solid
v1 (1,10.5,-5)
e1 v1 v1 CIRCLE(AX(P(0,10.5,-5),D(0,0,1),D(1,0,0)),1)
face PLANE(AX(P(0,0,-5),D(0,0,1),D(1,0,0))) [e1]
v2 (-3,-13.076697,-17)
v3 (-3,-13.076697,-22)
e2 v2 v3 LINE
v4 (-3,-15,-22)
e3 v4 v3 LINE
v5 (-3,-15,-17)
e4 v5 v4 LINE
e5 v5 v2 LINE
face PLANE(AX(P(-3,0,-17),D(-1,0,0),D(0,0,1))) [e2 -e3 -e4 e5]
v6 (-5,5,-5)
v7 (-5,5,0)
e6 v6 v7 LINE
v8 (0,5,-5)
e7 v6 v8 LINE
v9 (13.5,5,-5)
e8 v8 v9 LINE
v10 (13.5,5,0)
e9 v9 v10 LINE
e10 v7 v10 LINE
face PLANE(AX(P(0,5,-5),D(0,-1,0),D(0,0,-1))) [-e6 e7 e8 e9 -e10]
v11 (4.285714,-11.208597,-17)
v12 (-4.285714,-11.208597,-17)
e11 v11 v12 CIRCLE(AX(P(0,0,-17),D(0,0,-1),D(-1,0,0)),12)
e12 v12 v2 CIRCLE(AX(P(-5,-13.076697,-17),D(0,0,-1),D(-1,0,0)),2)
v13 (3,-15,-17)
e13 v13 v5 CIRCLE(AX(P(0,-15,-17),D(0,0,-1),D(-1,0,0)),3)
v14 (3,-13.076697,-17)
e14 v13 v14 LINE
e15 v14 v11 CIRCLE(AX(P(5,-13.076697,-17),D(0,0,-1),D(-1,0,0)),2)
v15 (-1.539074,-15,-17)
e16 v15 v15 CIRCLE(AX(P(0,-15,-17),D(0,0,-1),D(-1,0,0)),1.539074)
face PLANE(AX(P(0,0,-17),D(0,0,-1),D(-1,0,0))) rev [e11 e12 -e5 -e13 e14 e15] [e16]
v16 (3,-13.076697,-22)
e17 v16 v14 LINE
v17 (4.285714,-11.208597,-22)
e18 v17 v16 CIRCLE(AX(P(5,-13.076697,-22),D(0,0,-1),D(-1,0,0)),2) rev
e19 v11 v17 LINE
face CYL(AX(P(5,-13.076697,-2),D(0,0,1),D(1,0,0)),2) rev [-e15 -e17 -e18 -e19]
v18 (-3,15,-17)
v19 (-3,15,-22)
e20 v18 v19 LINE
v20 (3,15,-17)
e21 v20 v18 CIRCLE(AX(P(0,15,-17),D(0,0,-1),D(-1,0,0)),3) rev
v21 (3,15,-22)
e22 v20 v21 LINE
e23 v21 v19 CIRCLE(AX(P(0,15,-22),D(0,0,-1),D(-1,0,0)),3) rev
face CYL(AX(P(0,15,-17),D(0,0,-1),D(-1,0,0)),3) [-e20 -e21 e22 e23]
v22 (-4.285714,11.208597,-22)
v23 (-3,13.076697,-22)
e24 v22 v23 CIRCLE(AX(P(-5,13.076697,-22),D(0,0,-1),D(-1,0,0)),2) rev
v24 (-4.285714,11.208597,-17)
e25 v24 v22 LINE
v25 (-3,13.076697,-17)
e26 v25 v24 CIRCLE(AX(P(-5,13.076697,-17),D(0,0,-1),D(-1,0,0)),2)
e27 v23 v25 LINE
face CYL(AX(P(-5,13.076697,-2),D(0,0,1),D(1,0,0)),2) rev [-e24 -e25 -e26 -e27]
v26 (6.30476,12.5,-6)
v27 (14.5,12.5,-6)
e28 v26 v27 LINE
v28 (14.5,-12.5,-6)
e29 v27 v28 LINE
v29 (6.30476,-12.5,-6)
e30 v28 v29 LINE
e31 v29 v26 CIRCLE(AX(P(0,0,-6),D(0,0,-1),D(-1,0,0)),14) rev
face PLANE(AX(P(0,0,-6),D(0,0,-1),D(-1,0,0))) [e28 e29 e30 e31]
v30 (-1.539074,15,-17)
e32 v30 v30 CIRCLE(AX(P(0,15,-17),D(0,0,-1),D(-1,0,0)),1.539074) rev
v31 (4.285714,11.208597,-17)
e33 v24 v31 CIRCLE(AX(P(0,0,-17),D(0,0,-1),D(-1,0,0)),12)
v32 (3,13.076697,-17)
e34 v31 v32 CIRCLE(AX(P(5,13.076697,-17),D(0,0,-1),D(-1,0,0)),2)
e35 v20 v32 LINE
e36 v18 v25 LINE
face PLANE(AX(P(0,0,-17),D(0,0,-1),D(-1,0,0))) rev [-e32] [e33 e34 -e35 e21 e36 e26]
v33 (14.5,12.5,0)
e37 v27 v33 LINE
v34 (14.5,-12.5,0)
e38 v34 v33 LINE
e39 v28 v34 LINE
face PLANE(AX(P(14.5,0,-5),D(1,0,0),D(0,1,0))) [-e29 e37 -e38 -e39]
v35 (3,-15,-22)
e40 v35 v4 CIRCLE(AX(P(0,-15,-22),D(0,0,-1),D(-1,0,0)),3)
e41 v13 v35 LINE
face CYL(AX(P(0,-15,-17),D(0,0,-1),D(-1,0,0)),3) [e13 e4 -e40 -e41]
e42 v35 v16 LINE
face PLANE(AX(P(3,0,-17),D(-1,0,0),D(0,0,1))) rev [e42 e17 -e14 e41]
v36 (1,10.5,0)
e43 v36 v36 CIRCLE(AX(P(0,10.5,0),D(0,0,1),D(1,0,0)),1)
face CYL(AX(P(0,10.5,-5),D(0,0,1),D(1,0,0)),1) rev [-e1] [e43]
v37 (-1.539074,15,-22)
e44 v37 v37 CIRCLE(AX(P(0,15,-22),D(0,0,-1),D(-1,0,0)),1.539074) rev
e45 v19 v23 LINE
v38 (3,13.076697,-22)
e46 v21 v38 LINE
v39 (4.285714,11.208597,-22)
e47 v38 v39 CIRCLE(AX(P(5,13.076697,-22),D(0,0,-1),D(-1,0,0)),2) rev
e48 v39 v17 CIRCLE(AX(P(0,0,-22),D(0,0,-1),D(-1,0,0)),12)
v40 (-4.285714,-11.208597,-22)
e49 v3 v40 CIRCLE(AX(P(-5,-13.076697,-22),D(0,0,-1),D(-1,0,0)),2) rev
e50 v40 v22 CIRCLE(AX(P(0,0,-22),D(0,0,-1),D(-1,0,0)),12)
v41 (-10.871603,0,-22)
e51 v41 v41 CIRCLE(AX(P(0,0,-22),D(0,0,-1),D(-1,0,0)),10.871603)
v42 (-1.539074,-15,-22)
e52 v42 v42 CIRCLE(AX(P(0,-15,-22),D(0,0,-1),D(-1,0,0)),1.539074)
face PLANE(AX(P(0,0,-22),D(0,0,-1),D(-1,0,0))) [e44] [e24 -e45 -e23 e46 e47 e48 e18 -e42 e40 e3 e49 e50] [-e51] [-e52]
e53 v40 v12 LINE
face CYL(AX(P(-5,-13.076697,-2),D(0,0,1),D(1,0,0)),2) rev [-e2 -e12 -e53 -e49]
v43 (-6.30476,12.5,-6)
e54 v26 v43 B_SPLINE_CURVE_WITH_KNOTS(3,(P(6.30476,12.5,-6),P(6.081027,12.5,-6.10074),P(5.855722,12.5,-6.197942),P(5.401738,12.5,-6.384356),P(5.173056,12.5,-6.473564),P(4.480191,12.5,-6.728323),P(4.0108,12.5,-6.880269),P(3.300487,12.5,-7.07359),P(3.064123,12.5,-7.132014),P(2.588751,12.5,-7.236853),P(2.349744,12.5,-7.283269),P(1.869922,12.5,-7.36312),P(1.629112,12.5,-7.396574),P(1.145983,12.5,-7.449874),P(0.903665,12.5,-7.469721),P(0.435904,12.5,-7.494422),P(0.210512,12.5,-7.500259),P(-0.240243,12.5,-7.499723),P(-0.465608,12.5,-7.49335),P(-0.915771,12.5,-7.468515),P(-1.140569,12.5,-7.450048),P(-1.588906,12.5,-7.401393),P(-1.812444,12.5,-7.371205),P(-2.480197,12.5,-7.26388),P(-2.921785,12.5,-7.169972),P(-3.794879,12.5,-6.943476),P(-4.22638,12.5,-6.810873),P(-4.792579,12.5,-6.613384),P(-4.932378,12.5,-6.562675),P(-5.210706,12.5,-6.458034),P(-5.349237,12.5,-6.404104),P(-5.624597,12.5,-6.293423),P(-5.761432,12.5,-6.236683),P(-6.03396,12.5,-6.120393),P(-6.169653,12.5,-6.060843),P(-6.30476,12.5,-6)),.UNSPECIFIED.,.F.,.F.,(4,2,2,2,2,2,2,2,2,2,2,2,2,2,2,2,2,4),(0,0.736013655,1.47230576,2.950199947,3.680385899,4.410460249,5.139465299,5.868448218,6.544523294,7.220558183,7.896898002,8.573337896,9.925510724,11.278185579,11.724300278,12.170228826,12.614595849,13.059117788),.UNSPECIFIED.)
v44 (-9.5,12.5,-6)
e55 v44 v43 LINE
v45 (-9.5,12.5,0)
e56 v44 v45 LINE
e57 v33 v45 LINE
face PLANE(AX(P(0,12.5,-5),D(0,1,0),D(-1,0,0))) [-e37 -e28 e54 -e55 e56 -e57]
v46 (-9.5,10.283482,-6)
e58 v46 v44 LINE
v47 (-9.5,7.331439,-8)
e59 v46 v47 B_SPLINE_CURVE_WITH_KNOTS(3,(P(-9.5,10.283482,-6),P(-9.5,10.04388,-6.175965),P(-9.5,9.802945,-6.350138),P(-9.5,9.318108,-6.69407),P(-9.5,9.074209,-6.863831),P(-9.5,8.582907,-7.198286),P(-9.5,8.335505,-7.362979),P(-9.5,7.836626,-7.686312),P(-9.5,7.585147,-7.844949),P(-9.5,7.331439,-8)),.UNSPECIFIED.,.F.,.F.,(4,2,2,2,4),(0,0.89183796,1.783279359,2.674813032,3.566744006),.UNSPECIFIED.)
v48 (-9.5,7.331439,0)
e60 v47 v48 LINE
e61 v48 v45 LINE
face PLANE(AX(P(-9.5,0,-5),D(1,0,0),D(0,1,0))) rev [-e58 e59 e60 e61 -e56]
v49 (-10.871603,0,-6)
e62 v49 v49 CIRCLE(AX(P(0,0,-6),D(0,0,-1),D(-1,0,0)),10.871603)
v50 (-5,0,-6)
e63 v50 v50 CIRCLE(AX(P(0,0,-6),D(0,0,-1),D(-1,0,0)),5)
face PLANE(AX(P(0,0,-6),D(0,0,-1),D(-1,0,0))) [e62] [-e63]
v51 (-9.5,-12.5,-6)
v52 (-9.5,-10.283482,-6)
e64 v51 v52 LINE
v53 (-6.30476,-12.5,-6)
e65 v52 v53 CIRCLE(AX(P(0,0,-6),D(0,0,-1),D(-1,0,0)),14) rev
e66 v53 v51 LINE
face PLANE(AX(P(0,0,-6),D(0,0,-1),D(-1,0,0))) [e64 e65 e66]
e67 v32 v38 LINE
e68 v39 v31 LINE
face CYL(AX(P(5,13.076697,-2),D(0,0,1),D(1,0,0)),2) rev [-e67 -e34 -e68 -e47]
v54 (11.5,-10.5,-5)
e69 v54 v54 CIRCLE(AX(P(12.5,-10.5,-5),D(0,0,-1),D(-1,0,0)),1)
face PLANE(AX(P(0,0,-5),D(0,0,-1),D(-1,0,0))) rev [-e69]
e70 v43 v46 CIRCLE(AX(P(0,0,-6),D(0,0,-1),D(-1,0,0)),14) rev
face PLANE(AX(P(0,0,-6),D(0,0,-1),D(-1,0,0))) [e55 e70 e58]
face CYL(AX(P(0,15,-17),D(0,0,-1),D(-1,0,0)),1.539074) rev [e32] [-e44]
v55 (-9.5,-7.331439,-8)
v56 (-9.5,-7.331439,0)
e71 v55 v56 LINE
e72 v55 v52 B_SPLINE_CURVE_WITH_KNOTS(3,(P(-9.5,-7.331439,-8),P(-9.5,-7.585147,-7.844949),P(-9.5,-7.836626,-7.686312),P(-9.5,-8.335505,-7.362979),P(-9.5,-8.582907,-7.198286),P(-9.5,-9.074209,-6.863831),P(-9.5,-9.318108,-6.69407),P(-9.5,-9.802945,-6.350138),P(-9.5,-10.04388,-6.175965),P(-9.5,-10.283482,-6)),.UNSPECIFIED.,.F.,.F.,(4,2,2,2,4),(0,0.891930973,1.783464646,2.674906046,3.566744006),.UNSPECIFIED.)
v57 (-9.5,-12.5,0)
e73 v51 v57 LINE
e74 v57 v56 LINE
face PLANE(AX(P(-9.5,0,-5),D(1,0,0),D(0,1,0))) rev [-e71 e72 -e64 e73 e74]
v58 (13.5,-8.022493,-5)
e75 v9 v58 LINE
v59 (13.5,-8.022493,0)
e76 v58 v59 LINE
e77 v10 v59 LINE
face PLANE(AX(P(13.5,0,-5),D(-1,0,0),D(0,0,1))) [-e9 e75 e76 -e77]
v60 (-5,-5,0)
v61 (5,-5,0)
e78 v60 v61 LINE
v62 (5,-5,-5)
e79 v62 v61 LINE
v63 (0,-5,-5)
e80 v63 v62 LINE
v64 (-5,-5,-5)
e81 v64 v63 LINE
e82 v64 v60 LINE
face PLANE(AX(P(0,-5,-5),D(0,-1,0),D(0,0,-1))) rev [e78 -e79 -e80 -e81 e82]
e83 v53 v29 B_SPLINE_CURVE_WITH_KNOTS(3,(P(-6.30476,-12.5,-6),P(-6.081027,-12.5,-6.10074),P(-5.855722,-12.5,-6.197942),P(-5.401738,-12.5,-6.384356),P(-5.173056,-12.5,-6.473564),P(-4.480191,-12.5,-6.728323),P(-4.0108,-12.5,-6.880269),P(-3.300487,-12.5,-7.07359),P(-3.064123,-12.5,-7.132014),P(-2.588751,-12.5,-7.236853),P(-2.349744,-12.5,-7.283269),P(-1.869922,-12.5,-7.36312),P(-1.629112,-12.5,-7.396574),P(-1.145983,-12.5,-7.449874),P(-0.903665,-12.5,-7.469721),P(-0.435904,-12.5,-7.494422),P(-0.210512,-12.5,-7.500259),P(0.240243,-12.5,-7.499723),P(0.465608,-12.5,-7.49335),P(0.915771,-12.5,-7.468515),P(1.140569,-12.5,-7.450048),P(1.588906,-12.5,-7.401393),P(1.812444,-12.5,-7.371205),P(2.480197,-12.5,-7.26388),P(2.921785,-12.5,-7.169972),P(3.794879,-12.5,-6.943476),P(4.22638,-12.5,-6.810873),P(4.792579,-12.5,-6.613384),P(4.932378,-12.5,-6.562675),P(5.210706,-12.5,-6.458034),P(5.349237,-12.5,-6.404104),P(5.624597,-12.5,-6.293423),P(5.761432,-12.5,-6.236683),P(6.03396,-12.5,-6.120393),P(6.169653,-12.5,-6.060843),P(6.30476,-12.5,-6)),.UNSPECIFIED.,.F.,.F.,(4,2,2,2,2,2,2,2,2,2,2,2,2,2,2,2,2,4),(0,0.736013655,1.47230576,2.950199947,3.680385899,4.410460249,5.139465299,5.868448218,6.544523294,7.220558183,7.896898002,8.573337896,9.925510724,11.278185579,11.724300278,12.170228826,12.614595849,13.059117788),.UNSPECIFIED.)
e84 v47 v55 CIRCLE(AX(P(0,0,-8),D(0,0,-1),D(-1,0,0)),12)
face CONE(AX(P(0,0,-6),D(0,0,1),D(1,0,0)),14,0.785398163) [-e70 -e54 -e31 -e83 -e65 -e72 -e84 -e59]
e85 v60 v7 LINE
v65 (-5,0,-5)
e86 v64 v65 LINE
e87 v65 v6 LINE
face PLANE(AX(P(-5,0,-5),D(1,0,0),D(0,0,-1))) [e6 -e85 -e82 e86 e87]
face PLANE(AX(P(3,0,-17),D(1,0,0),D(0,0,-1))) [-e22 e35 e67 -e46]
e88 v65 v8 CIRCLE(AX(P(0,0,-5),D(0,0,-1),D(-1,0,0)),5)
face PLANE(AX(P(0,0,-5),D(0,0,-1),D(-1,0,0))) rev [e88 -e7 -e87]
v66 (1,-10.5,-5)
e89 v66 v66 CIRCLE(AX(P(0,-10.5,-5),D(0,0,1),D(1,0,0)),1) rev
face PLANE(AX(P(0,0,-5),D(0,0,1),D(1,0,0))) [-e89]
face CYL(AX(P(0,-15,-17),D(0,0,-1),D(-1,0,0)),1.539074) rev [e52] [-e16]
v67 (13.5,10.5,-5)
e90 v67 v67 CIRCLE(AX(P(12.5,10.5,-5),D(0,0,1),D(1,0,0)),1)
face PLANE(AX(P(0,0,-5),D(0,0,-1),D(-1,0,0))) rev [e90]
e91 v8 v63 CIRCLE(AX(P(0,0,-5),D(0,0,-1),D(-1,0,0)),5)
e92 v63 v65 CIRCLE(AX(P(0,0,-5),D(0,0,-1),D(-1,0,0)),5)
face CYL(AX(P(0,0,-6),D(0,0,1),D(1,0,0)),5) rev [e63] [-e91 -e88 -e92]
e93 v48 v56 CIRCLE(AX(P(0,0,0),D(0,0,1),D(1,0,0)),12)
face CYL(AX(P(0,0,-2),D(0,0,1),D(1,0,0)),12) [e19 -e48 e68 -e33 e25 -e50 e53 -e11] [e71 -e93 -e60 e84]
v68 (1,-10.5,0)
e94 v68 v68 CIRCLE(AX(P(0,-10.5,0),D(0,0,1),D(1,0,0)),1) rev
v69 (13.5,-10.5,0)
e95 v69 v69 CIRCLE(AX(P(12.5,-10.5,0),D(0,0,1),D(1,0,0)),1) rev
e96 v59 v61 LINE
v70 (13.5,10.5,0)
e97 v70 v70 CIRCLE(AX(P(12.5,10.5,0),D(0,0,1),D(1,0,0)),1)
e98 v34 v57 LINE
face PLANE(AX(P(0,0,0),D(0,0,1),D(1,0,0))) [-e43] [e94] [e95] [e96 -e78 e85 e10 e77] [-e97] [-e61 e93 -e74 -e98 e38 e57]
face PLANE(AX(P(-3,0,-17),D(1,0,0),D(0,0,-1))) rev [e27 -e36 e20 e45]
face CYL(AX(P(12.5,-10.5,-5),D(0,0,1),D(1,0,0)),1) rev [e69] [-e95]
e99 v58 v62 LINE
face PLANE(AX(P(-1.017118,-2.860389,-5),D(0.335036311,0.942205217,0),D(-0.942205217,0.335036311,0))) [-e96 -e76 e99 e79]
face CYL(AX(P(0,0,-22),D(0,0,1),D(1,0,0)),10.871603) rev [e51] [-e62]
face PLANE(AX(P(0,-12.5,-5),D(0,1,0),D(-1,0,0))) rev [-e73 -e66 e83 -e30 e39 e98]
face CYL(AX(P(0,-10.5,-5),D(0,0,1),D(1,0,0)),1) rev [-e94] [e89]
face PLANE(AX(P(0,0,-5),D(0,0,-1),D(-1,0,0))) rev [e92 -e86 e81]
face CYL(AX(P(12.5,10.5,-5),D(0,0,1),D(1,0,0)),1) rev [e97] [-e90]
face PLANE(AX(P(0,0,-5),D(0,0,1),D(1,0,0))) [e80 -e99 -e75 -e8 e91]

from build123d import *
from build123d.topology import SkipClean

# Parameters (mm, degrees)
SKETCH1_R               = 12
SKETCH1_R_2             = 4.75
BOSS_EXTRUDE1_DEPTH     = 2
SKETCH2_R               = 12
SKETCH2_R_2             = 10.871602624
BOSS_EXTRUDE3_DEPTH     = 20
BOSS_EXTRUDE4_START     = -5
SKETCH3_R               = 1.539073807
BOSS_EXTRUDE4_DEPTH     = 5
BOSS_EXTRUDE4_2_DEPTH   = 5
BOSS_EXTRUDE5_START     = -5
BOSS_EXTRUDE5_OUTLINE_R = 1
BOSS_EXTRUDE5_DEPTH     = 5
SKETCH5_4_R             = 1
CUT_EXTRUDE4_DEPTH      = 5
SKETCH6_R               = 1
BOSS_EXTRUDE11_DEPTH    = 1
CHAMFER1_SIZE           = 2
FILLET2_START           = -22
FILLET2_DEPTH           = 5
SKETCH7_R               = 12
BOSS_EXTRUDE13_DEPTH    = 1


with BuildPart() as part:
    # Sketch1 → Boss-Extrude1 (new body)
    with BuildSketch(Plane(origin=(0, 0, 0), x_dir=(0, 1, 0), z_dir=(0, 0, 1))):
        with Locations(Location((0, 0, 0), (0, 0, 270))):
            Circle(SKETCH1_R)
        with Locations(Location((0, 0, 0), (0, 0, 270))):
            Circle(SKETCH1_R_2, mode=Mode.SUBTRACT)
    extrude(amount=-BOSS_EXTRUDE1_DEPTH)

    # Sketch2 → Boss-Extrude3 (add)
    with BuildSketch(Plane(origin=(0, 0, -2), x_dir=(1, 0, 0), z_dir=(0, 0, -1))):
        Circle(SKETCH2_R)
        with Locations(Location((0, 0, 0), (0, 0, 180))):
            Circle(SKETCH2_R_2, mode=Mode.SUBTRACT)
    extrude(amount=BOSS_EXTRUDE3_DEPTH)

    # Boss-Extrude5: read off the stored shape, not the designer's step
    # Boss-Extrude5 outline → Boss-Extrude5 (add)
    # profile 1 of 2: a face of its own
    with BuildSketch(Plane.XY.offset(BOSS_EXTRUDE5_START)):
        with BuildLine():
            ThreePointArc((0.943785252, -10.83055922), (5.369140506, -9.453257314), (8.818682626, -6.357875459))
            Line((8.818682626, -6.357875459), (5, -5))
            Line((5, -5), (-5, -5))
            Line((-5, -5), (-5, 5))
            Line((-5, 5), (9.653587085, 5))
            ThreePointArc((9.653587085, 5), (6.047721085, 9.034202416), (0.943785252, 10.83055922))
            ThreePointArc((0.943785252, 10.83055922), (0, 9.5), (-0.943785252, 10.83055922))
            ThreePointArc((-0.943785252, 10.83055922), (-10.871602624, 0), (-0.943785252, -10.83055922))
            ThreePointArc((-0.943785252, -10.83055922), (0, -9.5), (0.943785252, -10.83055922))
        make_face()
    # profile 2 of 2: a face of its own
    with BuildSketch(Plane.XY.offset(BOSS_EXTRUDE5_START)):
        with BuildLine():
            Line((13.5, 5), (13.5, -8.022492971))
            Line((13.5, -8.022492971), (9.921541449, -6.750038169))
            ThreePointArc((9.921541449, -6.750038169), (0.359069733, -11.994626669), (-9.5, -7.331439149))
            Line((-9.5, -7.331439149), (-9.5, -12.5))
            Line((-9.5, -12.5), (14.5, -12.5))
            Line((14.5, -12.5), (14.5, 12.5))
            Line((14.5, 12.5), (-9.5, 12.5))
            Line((-9.5, 12.5), (-9.5, 7.331439149))
            ThreePointArc((-9.5, 7.331439149), (1.361991036, 11.922456979), (10.908712115, 5))
            Line((10.908712115, 5), (13.5, 5))
        make_face()
        with Locations((12.5, -10.5)):
            Circle(BOSS_EXTRUDE5_OUTLINE_R, mode=Mode.SUBTRACT)
        with Locations((12.5, 10.5)):
            Circle(BOSS_EXTRUDE5_OUTLINE_R, mode=Mode.SUBTRACT)
    extrude(amount=BOSS_EXTRUDE5_DEPTH)

    # Sketch5<4> → Cut-Extrude4 (cut)
    with SkipClean():  # the faces are left unmerged after this step: merging them gives an invalid solid
        with BuildSketch(Plane.XY):
            with BuildLine():
                ThreePointArc((-4.75, 0), (-3.358757211, 3.358757211), (0, 4.75))
                Line((0, 4.75), (0, 5))
                Line((0, 5), (-5, 5))
                Line((-5, 5), (-5, 0))
                Line((-5, 0), (-4.75, 0))
            make_face()
            with BuildLine():
                ThreePointArc((0, 4.75), (3.358757211, 3.358757211), (4.75, 0))
                Line((4.75, 0), (5, 0))
                Line((5, 0), (5, 5))
                Line((5, 5), (0, 5))
                Line((0, 5), (0, 4.75))
            make_face()
            with BuildLine():
                Line((5, 0), (4.75, 0))
                ThreePointArc((4.75, 0), (0, -4.75), (-4.75, 0))
                Line((-4.75, 0), (-5, 0))
                Line((-5, 0), (-5, -5))
                Line((-5, -5), (5, -5))
                Line((5, -5), (5, 0))
            make_face()
            with BuildLine():
                ThreePointArc((1, 10.5), (-0.707106781, 11.207106781), (0, 9.5))
                Line((0, 9.5), (0, 10.5))
                Line((0, 10.5), (1, 10.5))
            make_face()
            with BuildLine():
                Line((0, 10.5), (0, 9.5))
                ThreePointArc((0, 9.5), (0.707106781, 9.792893219), (1, 10.5))
                Line((1, 10.5), (0, 10.5))
            make_face()
            with Locations((0, -10.5)):
                Circle(SKETCH5_4_R)
            with BuildLine():
                Line((12, 0), (5, 0))
                Line((5, 0), (5, -5))
                Line((5, -5), (10.908712115, -5))
                ThreePointArc((10.908712115, -5), (11.724004123, -2.558852734), (12, 0))
            make_face()
            with BuildLine():
                Line((5, 5), (5, 0))
                Line((5, 0), (12, 0))
                ThreePointArc((12, 0), (11.724004123, 2.558852734), (10.908712115, 5))
                Line((10.908712115, 5), (5, 5))
            make_face()
            with BuildLine():
                Line((10.908712115, -5), (5, -5))
                Line((5, -5), (9.921541449, -6.750038169))
                ThreePointArc((9.921541449, -6.750038169), (10.451819185, -5.895716727), (10.908712115, -5))
            make_face()
        extrude(amount=-CUT_EXTRUDE4_DEPTH, mode=Mode.SUBTRACT)

    # Sketch6 → Boss-Extrude11 (add)
    # profile 1 of 4: a face of its own
    with SkipClean():  # the faces are left unmerged after this step: merging them gives an invalid solid
        with BuildSketch(Plane(origin=(0, 0, -5), x_dir=(1, 0, 0), z_dir=(0, 0, -1))):
            with BuildLine():
                Line((-9.5, 12.5), (-9.5, 7.331439149))
                ThreePointArc((-9.5, 7.331439149), (0.359069733, 11.994626669), (9.921541449, 6.750038169))
                Line((9.921541449, 6.750038169), (13.5, 8.022492971))
                Line((13.5, 8.022492971), (13.5, -5))
                Line((13.5, -5), (10.908712115, -5))
                ThreePointArc((10.908712115, -5), (1.361991036, -11.922456979), (-9.5, -7.331439149))
                Line((-9.5, -7.331439149), (-9.5, -12.5))
                Line((-9.5, -12.5), (14.5, -12.5))
                Line((14.5, -12.5), (14.5, 12.5))
                Line((14.5, 12.5), (-9.5, 12.5))
            make_face()
            with Locations((12.5, -10.5)):
                Circle(SKETCH6_R, mode=Mode.SUBTRACT)
            with Locations((12.5, 10.5)):
                Circle(SKETCH6_R, mode=Mode.SUBTRACT)
        # profile 2 of 4: a face of its own
        with BuildSketch(Plane(origin=(0, 0, -5), x_dir=(1, 0, 0), z_dir=(0, 0, -1))):
            with BuildLine():
                Line((13.5, 8.022492971), (9.921541449, 6.750038169))
                ThreePointArc((9.921541449, 6.750038169), (11.468620174, 3.531395094), (12, 0))
                ThreePointArc((12, 0), (11.724004123, -2.558852734), (10.908712115, -5))
                Line((10.908712115, -5), (13.5, -5))
                Line((13.5, -5), (13.5, 8.022492971))
            make_face()
        # profile 3 of 4: a face of its own
        with BuildSketch(Plane(origin=(0, 0, -5), x_dir=(1, 0, 0), z_dir=(0, 0, -1))):
            with Locations((12.5, 10.5)):
                Circle(SKETCH6_R)
        # profile 4 of 4: a face of its own
        with BuildSketch(Plane(origin=(0, 0, -5), x_dir=(1, 0, 0), z_dir=(0, 0, -1))):
            with Locations((12.5, -10.5)):
                Circle(SKETCH6_R)
        extrude(amount=BOSS_EXTRUDE11_DEPTH)

    # Chamfer1
    # the kernel refuses this chamfer: 2 mm, written as the material it adds along each edge
    with BuildSketch(Plane(origin=(0, 0, -6), x_dir=(1, 0, 0), z_dir=(0, 1, 0))) as chamfer1_piece_1_section:
        Polygon((12, CHAMFER1_SIZE), (12 + CHAMFER1_SIZE, 0), (12, 0), align=None)
    chamfer1_piece_1 = revolve(axis=Axis((0, 0, -6), (0, 0, -1)), revolution_arc=166.923988161, mode=Mode.PRIVATE)
    chamfer1_piece_1 = split(chamfer1_piece_1, bisect_by=Plane(origin=(-9.5, 0, -6), z_dir=(1, 0, 0)), keep=Keep.TOP, mode=Mode.PRIVATE)
    chamfer1_piece_1 = split(chamfer1_piece_1, bisect_by=Plane(origin=(0, -12.5, -6), z_dir=(0, 1, 0)), keep=Keep.TOP, mode=Mode.PRIVATE)
    add(chamfer1_piece_1)
    with BuildSketch(Plane(origin=(0, 0, -6), x_dir=(-0.9740707745580937, 0.22624351073963517, 0), z_dir=(-0.22624351073963517, -0.9740707745580937, 0))) as chamfer1_piece_2_section:
        Polygon((12, CHAMFER1_SIZE), (12 + CHAMFER1_SIZE, 0), (12, 0), align=None)
    chamfer1_piece_2 = revolve(axis=Axis((0, 0, -6), (0, 0, -1)), revolution_arc=166.923988161, mode=Mode.PRIVATE)
    chamfer1_piece_2 = split(chamfer1_piece_2, bisect_by=Plane(origin=(-9.5, 0, -6), z_dir=(1, 0, 0)), keep=Keep.TOP, mode=Mode.PRIVATE)
    chamfer1_piece_2 = split(chamfer1_piece_2, bisect_by=Plane(origin=(0, 12.5, -6), z_dir=(0, -1, 0)), keep=Keep.TOP, mode=Mode.PRIVATE)
    add(chamfer1_piece_2)


with BuildPart() as body_2:
    # Sketch3 → Boss-Extrude4 (new body)
    with BuildSketch(Plane(origin=(0, 0, -22), x_dir=(1, 0, 0), z_dir=(0, 0, -1)).offset(BOSS_EXTRUDE4_START)):
        with BuildLine():
            Line((3, 11.618950039), (3, 15))
            ThreePointArc((3, 15), (0, 18), (-3, 15))
            Line((-3, 15), (-3, 11.618950039))
            ThreePointArc((-3, 11.618950039), (-1.512051513, 11.904356355), (-6e-09, 12))
            ThreePointArc((-6e-09, 12), (1.512051507, 11.904356356), (3, 11.618950039))
        make_face()
        with Locations(Location((0, 15, 0), (0, 0, 180))):
            Circle(SKETCH3_R, mode=Mode.SUBTRACT)
    extrude(amount=BOSS_EXTRUDE4_DEPTH)


with BuildPart() as body_3:
    # Sketch3 → Boss-Extrude4 2 (new body)
    with BuildSketch(Plane(origin=(0, 0, -22), x_dir=(1, 0, 0), z_dir=(0, 0, -1)).offset(BOSS_EXTRUDE4_START)):
        with BuildLine():
            Line((-3, -11.618950039), (-3, -15))
            ThreePointArc((-3, -15), (0, -18), (3, -15))
            Line((3, -15), (3, -11.618950039))
            ThreePointArc((3, -11.618950039), (0, -12), (-3, -11.618950039))
        make_face()
        with Locations(Location((0, -15, 0), (0, 0, 180))):
            Circle(SKETCH3_R, mode=Mode.SUBTRACT)
    extrude(amount=BOSS_EXTRUDE4_2_DEPTH)


with BuildPart() as body_2_1:
    add(body_2.part)

    # Combine1: union body 3, part
    add(body_3.part)
    add(part.part)

    # Fillet2: read off the stored shape, not the designer's step
    # Fillet2 outline → Fillet2 (add)
    with SkipClean():  # the faces are left unmerged after this step: merging them gives an invalid solid
        with BuildSketch(Plane.XY.offset(FILLET2_START)):
            with BuildLine():
                ThreePointArc((4.285714286, 11.208597283), (3.352491058, 11.942803412), (3, 13.076696831))
                Line((3, 13.076696831), (3, 11.618950039))
                ThreePointArc((3, 11.618950039), (3.648630635, 11.431863124), (4.285714286, 11.208597283))
            make_face()
            with BuildLine():
                ThreePointArc((-4.285714286, 11.208597283), (-3.648630635, 11.431863124), (-3, 11.618950039))
                Line((-3, 11.618950039), (-3, 13.076696831))
                ThreePointArc((-3, 13.076696831), (-3.352491058, 11.942803412), (-4.285714286, 11.208597283))
            make_face()
            with BuildLine():
                ThreePointArc((3, -13.076696831), (3.352491058, -11.942803412), (4.285714286, -11.208597283))
                ThreePointArc((4.285714286, -11.208597283), (3.648630635, -11.431863124), (3, -11.618950039))
                Line((3, -11.618950039), (3, -13.076696831))
            make_face()
            with BuildLine():
                ThreePointArc((-3, -11.618950039), (-3.648630635, -11.431863124), (-4.285714286, -11.208597283))
                ThreePointArc((-4.285714286, -11.208597283), (-3.352491058, -11.942803412), (-3, -13.076696831))
                Line((-3, -13.076696831), (-3, -11.618950039))
            make_face()
        extrude(amount=FILLET2_DEPTH)
    add(body_2_1.part.scale(1), mode=Mode.REPLACE)  # the faces are merged on a copy

    # Sketch7 → Boss-Extrude13 (add)
    # profile 1 of 4: a face of its own
    with BuildSketch(Plane(origin=(0, 0, -5), x_dir=(1, 0, 0), z_dir=(0, 0, -1))):
        with Locations(Location((0, 0, 0), (0, 0, 290.924832428))):
            Circle(SKETCH7_R)
        with BuildLine():
            ThreePointArc((0, 5), (3.535533906, 3.535533906), (5, 0))
            ThreePointArc((5, 0), (3.535533906, -3.535533906), (0, -5))
            Line((0, -5), (9.653587086, -5))
            ThreePointArc((9.653587086, -5), (6.047721085, -9.034202416), (0.943785252, -10.83055922))
            ThreePointArc((0.943785252, -10.83055922), (0, -9.5), (-0.943785252, -10.83055922))
            ThreePointArc((-0.943785252, -10.83055922), (-10.871602624, 0), (-0.943785252, 10.83055922))
            ThreePointArc((-0.943785252, 10.83055922), (0, 9.5), (0.943785252, 10.83055922))
            ThreePointArc((0.943785252, 10.83055922), (5.369140507, 9.453257314), (8.818682627, 6.357875459))
            Line((8.818682627, 6.357875459), (5, 5))
            Line((5, 5), (0, 5))
        make_face(mode=Mode.SUBTRACT)
    # profile 2 of 4: a face of its own
    with BuildSketch(Plane(origin=(0, 0, -5), x_dir=(1, 0, 0), z_dir=(0, 0, -1))):
        with BuildLine():
            ThreePointArc((-0.943785252, -10.83055922), (0, -9.5), (0.943785252, -10.83055922))
            ThreePointArc((0.943785252, -10.83055922), (6.047721085, -9.034202416), (9.653587086, -5))
            Line((9.653587086, -5), (-5, -5))
            Line((-5, -5), (-5, 5))
            Line((-5, 5), (5, 5))
            Line((5, 5), (8.818682627, 6.357875459))
            ThreePointArc((8.818682627, 6.357875459), (5.369140507, 9.453257314), (0.943785252, 10.83055922))
            ThreePointArc((0.943785252, 10.83055922), (0, 9.5), (-0.943785252, 10.83055922))
            ThreePointArc((-0.943785252, 10.83055922), (-10.871602624, 0), (-0.943785252, -10.83055922))
        make_face()
    # profile 3 of 4: a face of its own
    with BuildSketch(Plane(origin=(0, 0, -5), x_dir=(1, 0, 0), z_dir=(0, 0, -1))):
        with BuildLine():
            ThreePointArc((-5, 0), (-3.535533906, 3.535533906), (0, 5))
            Line((0, 5), (-5, 5))
            Line((-5, 5), (-5, 0))
        make_face()
    # profile 4 of 4: a face of its own
    with BuildSketch(Plane(origin=(0, 0, -5), x_dir=(1, 0, 0), z_dir=(0, 0, -1))):
        with BuildLine():
            Line((-5, -5), (0, -5))
            ThreePointArc((0, -5), (-3.535533906, -3.535533906), (-5, 0))
            Line((-5, 0), (-5, -5))
        make_face()
    extrude(amount=BOSS_EXTRUDE13_DEPTH)


solid = body_2_1.part
